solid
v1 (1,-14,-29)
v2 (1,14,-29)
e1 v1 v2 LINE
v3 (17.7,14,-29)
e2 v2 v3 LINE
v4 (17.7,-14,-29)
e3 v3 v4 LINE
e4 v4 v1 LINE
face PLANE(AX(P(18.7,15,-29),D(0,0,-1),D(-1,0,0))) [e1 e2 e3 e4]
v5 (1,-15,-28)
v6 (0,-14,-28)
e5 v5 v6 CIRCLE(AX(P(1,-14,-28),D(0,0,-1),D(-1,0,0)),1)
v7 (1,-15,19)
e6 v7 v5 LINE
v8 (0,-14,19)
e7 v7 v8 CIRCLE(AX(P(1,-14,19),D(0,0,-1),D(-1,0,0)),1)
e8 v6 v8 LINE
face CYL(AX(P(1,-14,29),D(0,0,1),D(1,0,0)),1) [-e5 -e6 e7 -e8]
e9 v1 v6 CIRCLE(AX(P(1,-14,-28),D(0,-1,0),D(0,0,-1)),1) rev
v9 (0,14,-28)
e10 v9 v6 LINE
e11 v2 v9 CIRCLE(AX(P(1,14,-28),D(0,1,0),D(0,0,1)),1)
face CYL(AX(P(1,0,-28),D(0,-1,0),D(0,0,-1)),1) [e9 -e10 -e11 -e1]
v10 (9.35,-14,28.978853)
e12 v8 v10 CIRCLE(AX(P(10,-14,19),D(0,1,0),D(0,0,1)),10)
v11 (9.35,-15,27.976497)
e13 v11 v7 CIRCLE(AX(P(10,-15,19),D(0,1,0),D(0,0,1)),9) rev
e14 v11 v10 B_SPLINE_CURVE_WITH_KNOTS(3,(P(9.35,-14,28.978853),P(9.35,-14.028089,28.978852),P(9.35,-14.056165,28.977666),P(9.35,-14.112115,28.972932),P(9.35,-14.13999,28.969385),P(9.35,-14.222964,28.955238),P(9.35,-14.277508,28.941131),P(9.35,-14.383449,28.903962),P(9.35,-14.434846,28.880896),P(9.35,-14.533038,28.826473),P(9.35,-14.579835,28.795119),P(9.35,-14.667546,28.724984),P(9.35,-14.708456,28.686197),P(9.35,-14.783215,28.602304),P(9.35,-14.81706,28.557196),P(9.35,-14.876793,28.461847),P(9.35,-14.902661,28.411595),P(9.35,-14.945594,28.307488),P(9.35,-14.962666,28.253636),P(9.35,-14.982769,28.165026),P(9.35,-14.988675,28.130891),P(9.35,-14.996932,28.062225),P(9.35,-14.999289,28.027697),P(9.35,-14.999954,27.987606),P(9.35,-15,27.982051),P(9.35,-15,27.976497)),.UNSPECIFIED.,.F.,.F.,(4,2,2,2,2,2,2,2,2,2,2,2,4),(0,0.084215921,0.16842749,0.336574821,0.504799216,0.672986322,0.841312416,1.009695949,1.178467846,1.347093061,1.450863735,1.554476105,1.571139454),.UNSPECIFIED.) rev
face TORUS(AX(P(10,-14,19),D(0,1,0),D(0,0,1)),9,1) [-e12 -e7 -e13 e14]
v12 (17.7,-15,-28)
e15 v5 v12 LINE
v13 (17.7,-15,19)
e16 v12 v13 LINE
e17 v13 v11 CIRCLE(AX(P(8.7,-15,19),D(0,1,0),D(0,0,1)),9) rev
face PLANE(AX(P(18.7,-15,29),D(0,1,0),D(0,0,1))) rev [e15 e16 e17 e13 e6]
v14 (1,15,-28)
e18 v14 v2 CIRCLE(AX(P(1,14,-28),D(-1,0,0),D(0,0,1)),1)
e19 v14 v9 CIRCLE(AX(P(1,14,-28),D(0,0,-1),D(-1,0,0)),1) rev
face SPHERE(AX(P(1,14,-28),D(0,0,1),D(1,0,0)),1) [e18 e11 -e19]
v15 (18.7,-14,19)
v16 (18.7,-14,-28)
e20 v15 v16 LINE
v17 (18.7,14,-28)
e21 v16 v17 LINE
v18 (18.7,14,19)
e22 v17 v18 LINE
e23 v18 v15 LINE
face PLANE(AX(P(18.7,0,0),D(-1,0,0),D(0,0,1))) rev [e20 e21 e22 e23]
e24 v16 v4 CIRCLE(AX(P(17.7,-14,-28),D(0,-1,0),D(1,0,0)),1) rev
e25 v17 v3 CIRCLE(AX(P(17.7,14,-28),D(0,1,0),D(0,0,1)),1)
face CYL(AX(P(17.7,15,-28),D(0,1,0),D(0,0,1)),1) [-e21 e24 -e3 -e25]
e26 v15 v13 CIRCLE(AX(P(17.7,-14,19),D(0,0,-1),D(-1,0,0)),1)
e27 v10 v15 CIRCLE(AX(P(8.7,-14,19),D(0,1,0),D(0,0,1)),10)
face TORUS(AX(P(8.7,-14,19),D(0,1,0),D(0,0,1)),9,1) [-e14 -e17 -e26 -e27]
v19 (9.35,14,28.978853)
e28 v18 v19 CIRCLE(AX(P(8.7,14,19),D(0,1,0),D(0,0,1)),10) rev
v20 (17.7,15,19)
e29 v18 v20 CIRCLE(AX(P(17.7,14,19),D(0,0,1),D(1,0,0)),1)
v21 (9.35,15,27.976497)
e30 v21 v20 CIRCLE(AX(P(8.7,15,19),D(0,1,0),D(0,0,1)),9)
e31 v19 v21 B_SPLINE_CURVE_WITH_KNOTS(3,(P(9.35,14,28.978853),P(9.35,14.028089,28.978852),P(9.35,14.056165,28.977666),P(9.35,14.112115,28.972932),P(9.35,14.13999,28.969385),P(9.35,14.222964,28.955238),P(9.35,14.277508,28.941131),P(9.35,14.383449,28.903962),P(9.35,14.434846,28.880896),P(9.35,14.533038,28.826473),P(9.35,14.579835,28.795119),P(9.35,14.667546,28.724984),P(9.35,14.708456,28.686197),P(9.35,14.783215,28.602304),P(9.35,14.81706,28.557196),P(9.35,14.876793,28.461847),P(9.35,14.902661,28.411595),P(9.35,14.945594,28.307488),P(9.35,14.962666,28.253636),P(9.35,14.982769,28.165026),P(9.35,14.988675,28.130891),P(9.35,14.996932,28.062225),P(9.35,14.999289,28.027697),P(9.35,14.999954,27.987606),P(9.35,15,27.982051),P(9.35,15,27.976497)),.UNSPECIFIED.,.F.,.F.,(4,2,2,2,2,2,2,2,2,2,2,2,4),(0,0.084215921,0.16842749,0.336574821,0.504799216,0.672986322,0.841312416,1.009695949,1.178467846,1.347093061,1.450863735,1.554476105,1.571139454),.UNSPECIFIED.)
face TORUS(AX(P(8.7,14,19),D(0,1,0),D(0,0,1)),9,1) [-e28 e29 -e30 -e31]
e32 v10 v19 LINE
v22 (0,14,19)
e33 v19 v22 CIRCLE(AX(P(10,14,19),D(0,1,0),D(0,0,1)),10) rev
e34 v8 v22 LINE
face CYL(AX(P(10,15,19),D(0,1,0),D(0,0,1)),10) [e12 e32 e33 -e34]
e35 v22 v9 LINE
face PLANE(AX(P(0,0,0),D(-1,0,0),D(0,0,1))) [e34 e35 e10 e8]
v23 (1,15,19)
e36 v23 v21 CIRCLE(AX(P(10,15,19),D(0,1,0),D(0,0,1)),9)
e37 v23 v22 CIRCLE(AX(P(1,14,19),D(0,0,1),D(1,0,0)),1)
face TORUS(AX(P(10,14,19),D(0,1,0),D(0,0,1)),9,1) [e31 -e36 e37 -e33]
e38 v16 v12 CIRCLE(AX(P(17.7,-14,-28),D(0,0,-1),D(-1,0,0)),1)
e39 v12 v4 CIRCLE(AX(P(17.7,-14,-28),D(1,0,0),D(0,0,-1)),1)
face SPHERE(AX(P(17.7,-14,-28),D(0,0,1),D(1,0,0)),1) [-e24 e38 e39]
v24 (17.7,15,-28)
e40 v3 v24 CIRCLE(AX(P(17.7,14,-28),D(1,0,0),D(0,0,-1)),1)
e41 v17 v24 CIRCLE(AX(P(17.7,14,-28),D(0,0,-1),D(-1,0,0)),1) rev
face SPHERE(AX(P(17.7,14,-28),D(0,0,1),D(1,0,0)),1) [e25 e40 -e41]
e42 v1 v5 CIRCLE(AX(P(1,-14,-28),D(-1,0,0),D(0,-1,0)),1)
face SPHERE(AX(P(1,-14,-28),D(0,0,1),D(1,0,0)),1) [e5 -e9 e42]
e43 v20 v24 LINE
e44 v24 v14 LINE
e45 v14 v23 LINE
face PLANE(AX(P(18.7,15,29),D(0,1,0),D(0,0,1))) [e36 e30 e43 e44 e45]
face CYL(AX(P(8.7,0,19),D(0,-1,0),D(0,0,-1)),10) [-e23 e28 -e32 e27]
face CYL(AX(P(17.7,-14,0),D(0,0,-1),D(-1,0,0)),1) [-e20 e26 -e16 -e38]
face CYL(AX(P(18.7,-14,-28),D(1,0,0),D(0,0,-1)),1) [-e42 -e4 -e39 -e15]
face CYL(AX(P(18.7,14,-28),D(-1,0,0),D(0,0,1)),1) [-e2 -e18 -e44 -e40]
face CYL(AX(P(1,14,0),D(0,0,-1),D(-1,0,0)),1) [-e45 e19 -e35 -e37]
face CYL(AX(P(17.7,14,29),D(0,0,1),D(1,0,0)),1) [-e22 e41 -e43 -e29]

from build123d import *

# Parameters (mm, degrees)
SKETCH2_W           = 58
SKETCH2_H           = 30
BOSS_EXTRUDE1_DEPTH = 18.7
FILLET1_R           = 10
FILLET2_R           = 1


with BuildPart() as part:
    # Sketch2 → Boss-Extrude1 (new body)
    with BuildSketch(Plane(origin=(0, 0, 0), x_dir=(0, 0, -1), z_dir=(1, 0, 0))):
        Rectangle(SKETCH2_W, SKETCH2_H)
    extrude(amount=BOSS_EXTRUDE1_DEPTH)

    # Fillet1
    # the kernel refuses this fillet: 10 mm, written as the material it takes off along each edge
    with BuildSketch(Plane(origin=(0, -40, 29), x_dir=(1, 0, 0), z_dir=(0, 1, 0))) as fillet1_piece_1:
        with BuildLine():
            CenterArc((FILLET1_R, FILLET1_R), FILLET1_R, 180, 90)
            Line((0, FILLET1_R), (0, 0))
            Line((0, 0), (FILLET1_R, 0))
        make_face()
    extrude(amount=80, mode=Mode.SUBTRACT)
    with BuildSketch(Plane(origin=(18.7, -40, 29), x_dir=(-1, 0, 0), z_dir=(0, 1, 0))) as fillet1_piece_2:
        with BuildLine():
            CenterArc((FILLET1_R, -FILLET1_R), FILLET1_R, 90, 90)
            Line((0, -FILLET1_R), (0, 0))
            Line((0, 0), (FILLET1_R, 0))
        make_face()
    extrude(amount=80, mode=Mode.SUBTRACT)

    # Fillet2
    # the kernel refuses this fillet: 1 mm, written as the material it takes off along each edge
    with BuildSketch(Plane(origin=(1, -14, -28), x_dir=(0, 0, -1), z_dir=(-1, 0, 0))) as fillet2_piece_1_section:
        Polygon((0, 0), (FILLET2_R, 0), (FILLET2_R, FILLET2_R), (0, FILLET2_R), align=None)
    fillet2_piece_1 = extrude(amount=FILLET2_R, mode=Mode.PRIVATE)
    fillet2_piece_1 = fillet2_piece_1 - Plane(origin=(1, -14, -28), x_dir=(0, 0.7071067811865475, 0.7071067811865475), z_dir=(-1, 0, 0)) * Sphere(FILLET2_R, mode=Mode.PRIVATE)
    add(fillet2_piece_1, mode=Mode.SUBTRACT)
    with BuildSketch(Plane(origin=(17.7, -14, -28), x_dir=(1, 0, 0), z_dir=(0, 0, -1))) as fillet2_piece_2_section:
        Polygon((0, 0), (FILLET2_R, 0), (FILLET2_R, FILLET2_R), (0, FILLET2_R), align=None)
    fillet2_piece_2 = extrude(amount=FILLET2_R, mode=Mode.PRIVATE)
    fillet2_piece_2 = fillet2_piece_2 - Plane(origin=(17.7, -14, -28), x_dir=(-0.7071067811865475, 0.7071067811865475, 0), z_dir=(0, 0, -1)) * Sphere(FILLET2_R, mode=Mode.PRIVATE)
    add(fillet2_piece_2, mode=Mode.SUBTRACT)
    with BuildSketch(Plane(origin=(1, 14, -28), x_dir=(-1, 0, 0), z_dir=(0, 1, 0))) as fillet2_piece_3_section:
        Polygon((0, 0), (FILLET2_R, 0), (FILLET2_R, -FILLET2_R), (0, -FILLET2_R), align=None)
    fillet2_piece_3 = extrude(amount=FILLET2_R, mode=Mode.PRIVATE)
    fillet2_piece_3 = fillet2_piece_3 - Plane(origin=(1, 14, -28), x_dir=(0.7071067811865475, 0, 0.7071067811865475), z_dir=(0, 1, 0)) * Sphere(FILLET2_R, mode=Mode.PRIVATE)
    add(fillet2_piece_3, mode=Mode.SUBTRACT)
    with BuildSketch(Plane(origin=(17.7, 14, -28), x_dir=(0, 0, -1), z_dir=(0, 1, 0))) as fillet2_piece_4_section:
        Polygon((0, 0), (FILLET2_R, 0), (FILLET2_R, -FILLET2_R), (0, -FILLET2_R), align=None)
    fillet2_piece_4 = extrude(amount=FILLET2_R, mode=Mode.PRIVATE)
    fillet2_piece_4 = fillet2_piece_4 - Plane(origin=(17.7, 14, -28), x_dir=(-0.7071067811865475, 0, 0.7071067811865475), z_dir=(0, 1, 0)) * Sphere(FILLET2_R, mode=Mode.PRIVATE)
    add(fillet2_piece_4, mode=Mode.SUBTRACT)
    with BuildSketch(Plane(origin=(0, -15, -28), x_dir=(0, 1, 0), z_dir=(0, 0, 1)), Plane(origin=(18.7, 15, 19), x_dir=(-1, 0, 0), z_dir=(0, 0, -1))) as fillet2_piece_5:
        with BuildLine():
            CenterArc((FILLET2_R, -FILLET2_R), FILLET2_R, 90, 90)
            Line((0, -FILLET2_R), (0, 0))
            Line((0, 0), (FILLET2_R, 0))
        make_face()
    extrude(amount=47, mode=Mode.SUBTRACT)
    with BuildSketch(Plane(origin=(18.7, -15, -28), x_dir=(0, 1, 0), z_dir=(0, 0, 1)), Plane(origin=(0, 15, 19), x_dir=(1, 0, 0), z_dir=(0, 0, -1))) as fillet2_piece_6:
        with BuildLine():
            CenterArc((FILLET2_R, FILLET2_R), FILLET2_R, 180, 90)
            Line((0, FILLET2_R), (0, 0))
            Line((0, 0), (FILLET2_R, 0))
        make_face()
    extrude(amount=47, mode=Mode.SUBTRACT)
    with BuildSketch(Plane(origin=(8.7, -15, 19), x_dir=(1, 0, 0), z_dir=(0, 0, -1))) as fillet2_piece_7:
        with BuildLine():
            CenterArc((10 - FILLET2_R, -FILLET2_R), FILLET2_R, 0, 90)
            Line((10 - FILLET2_R, 0), (10, 0))
            Line((10, 0), (10, -FILLET2_R))
        make_face()
    revolve(axis=Axis((8.7, -15, 19), (0, -1, 0)), revolution_arc=100.602378983, mode=Mode.SUBTRACT)
    with BuildSketch(Plane(origin=(10, -15, 19), x_dir=(0.1839921630034736, 0, 0.9829277104412629), z_dir=(0.9829277104412629, 0, -0.1839921630034736))) as fillet2_piece_8:
        with BuildLine():
            CenterArc((10 - FILLET2_R, -FILLET2_R), FILLET2_R, 0, 90)
            Line((10 - FILLET2_R, 0), (10, 0))
            Line((10, 0), (10, -FILLET2_R))
        make_face()
    revolve(axis=Axis((10, -15, 19), (0, -1, 0)), revolution_arc=100.602378983, mode=Mode.SUBTRACT)
    with BuildSketch(Plane(origin=(8.7, 15, 19), x_dir=(1, 0, 0), z_dir=(0, 0, -1))) as fillet2_piece_9:
        with BuildLine():
            CenterArc((10 - FILLET2_R, FILLET2_R), FILLET2_R, 270, 90)
            Line((10, FILLET2_R), (10, 0))
            Line((10, 0), (10 - FILLET2_R, 0))
        make_face()
    revolve(axis=Axis((8.7, 15, 19), (0, -1, 0)), revolution_arc=100.602378983, mode=Mode.SUBTRACT)
    with BuildSketch(Plane(origin=(10, 15, 19), x_dir=(0.1839921630034736, 0, 0.9829277104412629), z_dir=(0.9829277104412629, 0, -0.1839921630034736))) as fillet2_piece_10:
        with BuildLine():
            CenterArc((10 - FILLET2_R, FILLET2_R), FILLET2_R, 270, 90)
            Line((10, FILLET2_R), (10, 0))
            Line((10, 0), (10 - FILLET2_R, 0))
        make_face()
    revolve(axis=Axis((10, 15, 19), (0, -1, 0)), revolution_arc=100.602378983, mode=Mode.SUBTRACT)
    with BuildSketch(Plane(origin=(0, 14, -29), x_dir=(0, 0, 1), z_dir=(0, -1, 0)), Plane(origin=(18.7, 14, -29), x_dir=(-1, 0, 0), z_dir=(0, -1, 0))) as fillet2_piece_11:
        with BuildLine():
            CenterArc((FILLET2_R, -FILLET2_R), FILLET2_R, 90, 90)
            Line((0, -FILLET2_R), (0, 0))
            Line((0, 0), (FILLET2_R, 0))
        make_face()
    extrude(amount=28, mode=Mode.SUBTRACT)
    with BuildSketch(Plane(origin=(1, -15, -29), x_dir=(0, 1, 0), z_dir=(1, 0, 0)), Plane(origin=(1, 15, -29), x_dir=(0, 0, 1), z_dir=(1, 0, 0))) as fillet2_piece_12:
        with BuildLine():
            CenterArc((FILLET2_R, FILLET2_R), FILLET2_R, 180, 90)
            Line((0, FILLET2_R), (0, 0))
            Line((0, 0), (FILLET2_R, 0))
        make_face()
    extrude(amount=16.7, mode=Mode.SUBTRACT)


solid = part.part
